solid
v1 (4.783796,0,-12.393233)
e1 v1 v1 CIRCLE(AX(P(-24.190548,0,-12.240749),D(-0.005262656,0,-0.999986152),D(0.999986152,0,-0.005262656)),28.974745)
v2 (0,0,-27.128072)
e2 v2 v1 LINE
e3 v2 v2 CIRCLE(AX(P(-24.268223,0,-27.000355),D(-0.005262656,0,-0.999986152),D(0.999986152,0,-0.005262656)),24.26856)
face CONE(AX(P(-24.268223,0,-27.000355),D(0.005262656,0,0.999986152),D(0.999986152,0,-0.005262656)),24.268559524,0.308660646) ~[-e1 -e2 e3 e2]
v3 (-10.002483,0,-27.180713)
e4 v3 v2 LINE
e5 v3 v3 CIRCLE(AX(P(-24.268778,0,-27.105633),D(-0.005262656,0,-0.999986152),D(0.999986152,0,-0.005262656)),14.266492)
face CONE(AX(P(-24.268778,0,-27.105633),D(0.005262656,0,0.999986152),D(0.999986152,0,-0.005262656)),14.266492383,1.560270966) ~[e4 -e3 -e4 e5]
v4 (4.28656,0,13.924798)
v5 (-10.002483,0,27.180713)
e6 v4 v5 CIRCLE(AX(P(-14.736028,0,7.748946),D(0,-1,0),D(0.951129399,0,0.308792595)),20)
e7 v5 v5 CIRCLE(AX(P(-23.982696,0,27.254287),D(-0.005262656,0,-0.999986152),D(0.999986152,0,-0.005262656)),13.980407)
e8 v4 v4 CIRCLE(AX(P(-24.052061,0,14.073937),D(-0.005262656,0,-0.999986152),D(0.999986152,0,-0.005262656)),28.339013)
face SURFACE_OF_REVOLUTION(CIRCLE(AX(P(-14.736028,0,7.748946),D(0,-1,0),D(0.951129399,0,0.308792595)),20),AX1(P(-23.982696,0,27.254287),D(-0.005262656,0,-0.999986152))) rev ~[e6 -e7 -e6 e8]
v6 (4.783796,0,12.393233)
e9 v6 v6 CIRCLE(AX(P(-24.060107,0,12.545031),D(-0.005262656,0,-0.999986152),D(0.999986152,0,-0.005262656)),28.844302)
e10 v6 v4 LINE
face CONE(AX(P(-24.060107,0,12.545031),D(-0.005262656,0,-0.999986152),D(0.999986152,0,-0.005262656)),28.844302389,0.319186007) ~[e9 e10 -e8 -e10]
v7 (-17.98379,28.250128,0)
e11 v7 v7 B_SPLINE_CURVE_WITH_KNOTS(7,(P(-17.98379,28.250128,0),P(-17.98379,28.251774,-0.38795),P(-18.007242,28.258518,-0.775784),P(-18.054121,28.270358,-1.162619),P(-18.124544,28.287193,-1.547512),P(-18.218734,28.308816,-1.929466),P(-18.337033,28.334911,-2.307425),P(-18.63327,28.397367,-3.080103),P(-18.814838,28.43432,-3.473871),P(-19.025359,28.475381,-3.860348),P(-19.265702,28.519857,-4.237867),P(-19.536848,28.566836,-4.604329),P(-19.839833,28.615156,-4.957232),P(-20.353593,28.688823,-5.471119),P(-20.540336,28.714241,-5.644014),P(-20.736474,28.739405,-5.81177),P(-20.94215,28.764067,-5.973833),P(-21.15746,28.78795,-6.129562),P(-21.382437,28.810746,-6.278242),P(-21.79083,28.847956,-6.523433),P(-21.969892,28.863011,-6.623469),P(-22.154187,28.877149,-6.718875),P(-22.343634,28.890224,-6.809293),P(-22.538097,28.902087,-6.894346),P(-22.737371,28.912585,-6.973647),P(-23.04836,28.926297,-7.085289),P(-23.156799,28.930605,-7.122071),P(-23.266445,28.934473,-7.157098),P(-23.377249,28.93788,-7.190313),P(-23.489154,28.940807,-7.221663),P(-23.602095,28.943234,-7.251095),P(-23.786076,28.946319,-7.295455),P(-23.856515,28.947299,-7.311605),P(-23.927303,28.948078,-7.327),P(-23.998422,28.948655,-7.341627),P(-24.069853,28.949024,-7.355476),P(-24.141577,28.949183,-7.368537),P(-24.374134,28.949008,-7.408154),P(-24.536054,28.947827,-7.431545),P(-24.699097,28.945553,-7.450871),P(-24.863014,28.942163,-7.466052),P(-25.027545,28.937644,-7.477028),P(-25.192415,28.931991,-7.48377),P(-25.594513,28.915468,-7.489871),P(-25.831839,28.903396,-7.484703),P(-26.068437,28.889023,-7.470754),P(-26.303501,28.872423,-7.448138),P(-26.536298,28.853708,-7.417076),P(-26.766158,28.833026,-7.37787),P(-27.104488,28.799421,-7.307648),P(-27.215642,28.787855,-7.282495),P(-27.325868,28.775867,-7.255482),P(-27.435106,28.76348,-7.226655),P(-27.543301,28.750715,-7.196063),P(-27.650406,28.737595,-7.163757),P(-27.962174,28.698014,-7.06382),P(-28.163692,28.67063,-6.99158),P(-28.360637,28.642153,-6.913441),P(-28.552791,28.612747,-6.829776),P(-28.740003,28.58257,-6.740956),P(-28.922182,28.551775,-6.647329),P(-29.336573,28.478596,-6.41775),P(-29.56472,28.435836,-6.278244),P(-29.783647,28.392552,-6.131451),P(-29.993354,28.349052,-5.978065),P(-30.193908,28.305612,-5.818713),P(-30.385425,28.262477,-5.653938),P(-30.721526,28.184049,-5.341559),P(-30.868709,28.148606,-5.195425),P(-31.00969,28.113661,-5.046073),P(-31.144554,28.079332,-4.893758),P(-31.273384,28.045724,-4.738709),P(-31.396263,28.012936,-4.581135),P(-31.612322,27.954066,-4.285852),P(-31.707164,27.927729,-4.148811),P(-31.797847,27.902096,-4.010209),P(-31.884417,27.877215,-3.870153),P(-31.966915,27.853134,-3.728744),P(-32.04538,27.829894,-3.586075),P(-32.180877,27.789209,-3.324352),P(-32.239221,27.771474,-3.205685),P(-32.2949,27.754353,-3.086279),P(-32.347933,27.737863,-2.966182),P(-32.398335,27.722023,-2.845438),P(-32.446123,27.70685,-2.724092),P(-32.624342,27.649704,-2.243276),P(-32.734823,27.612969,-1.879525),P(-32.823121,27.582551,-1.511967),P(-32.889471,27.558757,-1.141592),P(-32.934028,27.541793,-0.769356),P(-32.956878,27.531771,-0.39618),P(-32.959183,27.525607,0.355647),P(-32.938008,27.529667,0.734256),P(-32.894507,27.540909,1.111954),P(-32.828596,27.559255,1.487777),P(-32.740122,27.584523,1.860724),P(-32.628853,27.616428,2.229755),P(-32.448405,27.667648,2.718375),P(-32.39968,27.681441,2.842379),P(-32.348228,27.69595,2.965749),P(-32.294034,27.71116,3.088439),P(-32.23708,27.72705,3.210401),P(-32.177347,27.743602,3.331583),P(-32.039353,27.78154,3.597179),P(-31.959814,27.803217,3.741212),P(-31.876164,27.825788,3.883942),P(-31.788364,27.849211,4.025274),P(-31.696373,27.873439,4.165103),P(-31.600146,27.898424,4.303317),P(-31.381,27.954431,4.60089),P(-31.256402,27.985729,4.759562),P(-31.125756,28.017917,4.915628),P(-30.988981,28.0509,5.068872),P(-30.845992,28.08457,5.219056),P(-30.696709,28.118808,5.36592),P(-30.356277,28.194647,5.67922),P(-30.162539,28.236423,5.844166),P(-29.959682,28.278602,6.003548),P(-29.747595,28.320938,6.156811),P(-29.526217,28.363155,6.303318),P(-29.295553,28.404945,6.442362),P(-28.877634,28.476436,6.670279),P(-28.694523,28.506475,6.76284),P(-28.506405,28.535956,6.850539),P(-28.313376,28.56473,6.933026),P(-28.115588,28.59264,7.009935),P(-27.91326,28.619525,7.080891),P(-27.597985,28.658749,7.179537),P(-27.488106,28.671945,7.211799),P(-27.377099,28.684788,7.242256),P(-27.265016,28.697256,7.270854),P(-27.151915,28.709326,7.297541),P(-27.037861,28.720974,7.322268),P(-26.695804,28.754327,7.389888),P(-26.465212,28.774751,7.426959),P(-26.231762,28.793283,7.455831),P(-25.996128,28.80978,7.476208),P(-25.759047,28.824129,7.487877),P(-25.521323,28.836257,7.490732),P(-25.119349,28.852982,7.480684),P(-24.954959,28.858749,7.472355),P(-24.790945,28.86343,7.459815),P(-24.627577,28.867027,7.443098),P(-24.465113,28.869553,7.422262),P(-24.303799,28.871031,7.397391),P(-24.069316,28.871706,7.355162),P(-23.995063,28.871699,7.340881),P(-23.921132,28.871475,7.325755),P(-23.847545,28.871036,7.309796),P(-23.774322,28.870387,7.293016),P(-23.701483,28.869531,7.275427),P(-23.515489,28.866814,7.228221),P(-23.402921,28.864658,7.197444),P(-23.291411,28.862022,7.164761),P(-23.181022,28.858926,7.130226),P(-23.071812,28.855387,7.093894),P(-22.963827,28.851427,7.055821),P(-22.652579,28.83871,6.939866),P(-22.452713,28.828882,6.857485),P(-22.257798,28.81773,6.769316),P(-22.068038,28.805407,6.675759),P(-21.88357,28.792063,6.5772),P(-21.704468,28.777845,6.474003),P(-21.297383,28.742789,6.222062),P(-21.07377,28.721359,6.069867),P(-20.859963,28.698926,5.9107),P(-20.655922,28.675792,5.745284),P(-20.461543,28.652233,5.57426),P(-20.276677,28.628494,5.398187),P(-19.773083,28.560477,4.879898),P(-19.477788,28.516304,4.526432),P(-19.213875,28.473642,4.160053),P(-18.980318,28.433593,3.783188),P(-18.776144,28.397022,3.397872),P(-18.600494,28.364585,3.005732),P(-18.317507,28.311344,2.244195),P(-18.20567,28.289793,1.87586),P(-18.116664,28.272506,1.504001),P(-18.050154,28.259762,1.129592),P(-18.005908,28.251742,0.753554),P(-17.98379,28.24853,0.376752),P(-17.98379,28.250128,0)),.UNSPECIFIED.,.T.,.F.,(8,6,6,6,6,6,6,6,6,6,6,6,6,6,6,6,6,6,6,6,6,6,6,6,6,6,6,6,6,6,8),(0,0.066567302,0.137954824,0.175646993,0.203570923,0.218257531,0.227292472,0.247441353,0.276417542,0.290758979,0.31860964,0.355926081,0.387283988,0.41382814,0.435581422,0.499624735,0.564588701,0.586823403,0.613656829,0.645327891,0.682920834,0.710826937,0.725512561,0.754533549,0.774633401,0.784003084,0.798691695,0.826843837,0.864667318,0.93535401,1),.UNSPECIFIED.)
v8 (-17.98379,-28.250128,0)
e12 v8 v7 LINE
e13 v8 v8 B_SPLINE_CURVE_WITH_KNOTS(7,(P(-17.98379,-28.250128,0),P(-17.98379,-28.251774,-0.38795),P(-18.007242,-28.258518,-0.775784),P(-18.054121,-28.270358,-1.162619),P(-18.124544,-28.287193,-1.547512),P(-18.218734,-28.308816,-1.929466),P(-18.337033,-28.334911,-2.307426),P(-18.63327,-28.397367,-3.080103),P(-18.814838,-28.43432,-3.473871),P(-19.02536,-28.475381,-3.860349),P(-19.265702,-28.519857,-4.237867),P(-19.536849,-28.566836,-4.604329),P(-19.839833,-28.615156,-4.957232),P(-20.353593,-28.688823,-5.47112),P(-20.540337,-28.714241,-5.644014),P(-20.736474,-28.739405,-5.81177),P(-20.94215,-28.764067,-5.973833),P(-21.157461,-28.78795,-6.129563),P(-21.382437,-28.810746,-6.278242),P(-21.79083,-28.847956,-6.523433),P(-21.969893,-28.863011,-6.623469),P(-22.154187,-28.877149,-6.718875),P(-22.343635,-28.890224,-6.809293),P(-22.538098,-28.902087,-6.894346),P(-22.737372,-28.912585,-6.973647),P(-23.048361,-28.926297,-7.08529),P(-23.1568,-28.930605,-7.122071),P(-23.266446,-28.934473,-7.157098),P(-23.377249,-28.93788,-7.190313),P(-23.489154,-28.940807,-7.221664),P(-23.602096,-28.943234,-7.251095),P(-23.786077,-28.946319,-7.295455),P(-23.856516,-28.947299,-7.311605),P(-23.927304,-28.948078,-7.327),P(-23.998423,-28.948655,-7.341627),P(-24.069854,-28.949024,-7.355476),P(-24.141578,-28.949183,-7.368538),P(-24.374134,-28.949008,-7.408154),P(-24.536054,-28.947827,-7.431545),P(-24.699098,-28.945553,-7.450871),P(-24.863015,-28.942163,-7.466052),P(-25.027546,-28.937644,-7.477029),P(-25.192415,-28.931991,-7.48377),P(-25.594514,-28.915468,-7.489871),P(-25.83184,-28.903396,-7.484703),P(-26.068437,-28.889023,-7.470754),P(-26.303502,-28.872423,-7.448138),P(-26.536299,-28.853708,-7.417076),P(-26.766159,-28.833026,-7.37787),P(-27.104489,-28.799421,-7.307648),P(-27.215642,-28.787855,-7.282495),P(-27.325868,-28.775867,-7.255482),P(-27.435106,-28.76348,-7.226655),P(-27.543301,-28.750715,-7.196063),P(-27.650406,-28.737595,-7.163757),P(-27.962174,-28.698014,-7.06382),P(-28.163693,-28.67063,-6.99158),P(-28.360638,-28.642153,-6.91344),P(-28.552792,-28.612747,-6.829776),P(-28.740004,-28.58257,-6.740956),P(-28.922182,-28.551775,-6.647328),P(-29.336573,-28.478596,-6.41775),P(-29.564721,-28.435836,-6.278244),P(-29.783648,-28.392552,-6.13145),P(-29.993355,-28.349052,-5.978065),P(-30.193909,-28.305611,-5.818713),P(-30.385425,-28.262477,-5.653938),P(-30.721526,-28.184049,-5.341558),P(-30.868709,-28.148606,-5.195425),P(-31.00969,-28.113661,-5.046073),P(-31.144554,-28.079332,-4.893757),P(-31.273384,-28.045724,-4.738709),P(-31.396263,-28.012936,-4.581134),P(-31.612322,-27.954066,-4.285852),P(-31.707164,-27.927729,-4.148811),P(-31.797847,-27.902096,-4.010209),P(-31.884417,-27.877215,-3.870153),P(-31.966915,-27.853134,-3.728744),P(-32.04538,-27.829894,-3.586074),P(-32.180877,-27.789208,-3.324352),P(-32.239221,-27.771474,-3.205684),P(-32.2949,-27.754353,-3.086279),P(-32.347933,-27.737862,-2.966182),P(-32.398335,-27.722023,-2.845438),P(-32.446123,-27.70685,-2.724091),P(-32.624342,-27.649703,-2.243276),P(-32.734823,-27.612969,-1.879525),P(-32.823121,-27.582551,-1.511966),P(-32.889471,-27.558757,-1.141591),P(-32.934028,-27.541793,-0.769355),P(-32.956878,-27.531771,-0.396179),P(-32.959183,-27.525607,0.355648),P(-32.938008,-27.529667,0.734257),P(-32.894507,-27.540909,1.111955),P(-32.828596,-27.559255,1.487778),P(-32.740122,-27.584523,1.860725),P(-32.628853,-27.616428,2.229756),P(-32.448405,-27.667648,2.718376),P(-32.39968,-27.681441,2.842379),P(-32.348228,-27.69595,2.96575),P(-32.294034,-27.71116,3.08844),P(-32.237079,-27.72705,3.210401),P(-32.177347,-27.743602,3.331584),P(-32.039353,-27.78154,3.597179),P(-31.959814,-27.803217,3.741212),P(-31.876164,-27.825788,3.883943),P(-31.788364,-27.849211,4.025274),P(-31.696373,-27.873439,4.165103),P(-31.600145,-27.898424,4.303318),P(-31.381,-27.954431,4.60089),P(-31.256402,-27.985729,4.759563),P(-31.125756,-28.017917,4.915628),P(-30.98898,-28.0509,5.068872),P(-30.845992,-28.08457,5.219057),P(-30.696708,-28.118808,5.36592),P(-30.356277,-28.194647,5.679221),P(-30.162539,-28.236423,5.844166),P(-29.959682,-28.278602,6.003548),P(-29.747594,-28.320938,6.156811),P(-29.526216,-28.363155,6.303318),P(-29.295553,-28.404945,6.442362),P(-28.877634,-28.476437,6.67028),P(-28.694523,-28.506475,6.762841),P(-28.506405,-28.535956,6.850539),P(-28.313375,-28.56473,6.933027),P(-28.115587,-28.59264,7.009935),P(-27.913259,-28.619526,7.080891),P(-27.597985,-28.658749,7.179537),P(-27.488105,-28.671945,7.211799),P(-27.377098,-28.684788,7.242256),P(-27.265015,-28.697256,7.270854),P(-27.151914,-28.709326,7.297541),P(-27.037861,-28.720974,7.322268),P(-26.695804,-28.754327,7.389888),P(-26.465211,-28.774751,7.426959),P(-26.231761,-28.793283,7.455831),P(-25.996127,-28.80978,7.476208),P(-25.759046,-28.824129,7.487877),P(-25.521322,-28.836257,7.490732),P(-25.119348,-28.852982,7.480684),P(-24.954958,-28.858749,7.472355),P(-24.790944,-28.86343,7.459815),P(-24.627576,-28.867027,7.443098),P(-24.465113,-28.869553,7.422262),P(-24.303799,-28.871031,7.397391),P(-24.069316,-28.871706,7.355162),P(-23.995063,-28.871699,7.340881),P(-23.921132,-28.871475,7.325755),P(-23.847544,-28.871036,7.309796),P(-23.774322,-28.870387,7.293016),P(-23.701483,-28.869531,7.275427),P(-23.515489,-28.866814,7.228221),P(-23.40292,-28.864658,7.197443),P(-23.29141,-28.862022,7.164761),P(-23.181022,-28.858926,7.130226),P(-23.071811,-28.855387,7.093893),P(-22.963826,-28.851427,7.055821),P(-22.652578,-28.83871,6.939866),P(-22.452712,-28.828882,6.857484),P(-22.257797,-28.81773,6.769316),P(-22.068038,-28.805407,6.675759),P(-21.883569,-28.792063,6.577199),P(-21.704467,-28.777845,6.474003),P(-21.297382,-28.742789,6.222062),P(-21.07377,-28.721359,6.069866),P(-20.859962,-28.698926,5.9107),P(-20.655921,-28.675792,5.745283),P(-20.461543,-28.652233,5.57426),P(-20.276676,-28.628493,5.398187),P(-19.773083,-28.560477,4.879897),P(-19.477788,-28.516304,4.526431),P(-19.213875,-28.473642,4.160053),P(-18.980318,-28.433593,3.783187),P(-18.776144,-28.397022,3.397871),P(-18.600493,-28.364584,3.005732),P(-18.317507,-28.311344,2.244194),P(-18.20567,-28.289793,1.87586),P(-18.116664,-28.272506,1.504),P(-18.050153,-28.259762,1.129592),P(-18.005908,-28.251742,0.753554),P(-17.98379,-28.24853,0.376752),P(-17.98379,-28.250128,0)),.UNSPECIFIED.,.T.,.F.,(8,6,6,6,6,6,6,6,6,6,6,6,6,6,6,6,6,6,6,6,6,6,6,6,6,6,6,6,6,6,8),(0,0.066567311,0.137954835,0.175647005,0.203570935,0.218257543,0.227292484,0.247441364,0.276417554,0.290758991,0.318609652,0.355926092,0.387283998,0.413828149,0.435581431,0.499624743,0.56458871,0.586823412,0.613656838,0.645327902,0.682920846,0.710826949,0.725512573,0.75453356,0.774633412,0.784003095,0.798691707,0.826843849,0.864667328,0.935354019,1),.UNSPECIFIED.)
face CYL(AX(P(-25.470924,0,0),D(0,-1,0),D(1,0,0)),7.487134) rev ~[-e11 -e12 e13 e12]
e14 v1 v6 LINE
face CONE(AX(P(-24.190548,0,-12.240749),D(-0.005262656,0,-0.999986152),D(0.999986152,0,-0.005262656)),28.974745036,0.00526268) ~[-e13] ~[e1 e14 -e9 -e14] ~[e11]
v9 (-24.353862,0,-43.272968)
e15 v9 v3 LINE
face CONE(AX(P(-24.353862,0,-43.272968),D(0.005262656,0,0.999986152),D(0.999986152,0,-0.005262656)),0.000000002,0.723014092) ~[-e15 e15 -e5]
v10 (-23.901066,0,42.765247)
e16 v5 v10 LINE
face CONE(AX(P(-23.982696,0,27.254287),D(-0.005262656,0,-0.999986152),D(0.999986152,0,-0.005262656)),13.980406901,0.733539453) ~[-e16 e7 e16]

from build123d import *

# Parameters (mm, degrees)
F2_R          = 7.4871337732
F3_DEPTH      = 38.4
F3_DEPTH_BACK = 28.9757450369


# Not quite as in the source:
# - a fillet or chamfer that OpenCascade refuses, or shapes differently, is made with other operations: its cross-section is extruded or revolved along the edge and cut away or added


with BuildPart() as f1:
    # F0 (on Front) → F1 (revolve)
    with BuildSketch(Plane.XZ):
        Polygon((-10.0024826825, 27.1807126701), (-23.9010660062, 42.7652467351), (-24.3538618088, -43.2729683816), (-10.0024826825, -27.1807126701), (0, -27.1280723152), (4.7837961465, -12.3932333663), (4.7837961465, 0), (4.7837961465, 12.3932333663), (0, 27.1280723152), align=None)
    revolve(axis=Axis((-24.1274639075, 0, -0.2538608233), (-0.005262656, 0, -0.9999861521)))

    # F2 (on Front) → F3 (cut, two sides)
    with BuildSketch(Plane.XZ) as f3_sk:
        with Locations((-25.4709236324, 0)):
            Circle(F2_R)
    extrude(amount=-F3_DEPTH, mode=Mode.SUBTRACT)
    extrude(f3_sk.sketch, amount=F3_DEPTH_BACK, mode=Mode.SUBTRACT)

    # F4: fillet of radius 20 on 1 edges, made by hand

    # F4_s1 → F4_t2 (revolve, cut)
    with BuildSketch(Plane.XZ):
        with BuildLine():
            ThreePointArc((4.2865600872, 13.9247980545), (-1.133885263, 22.4112009628), (-10.0024826825, 27.1807126701))
            Line((-10.0024826825, 27.1807126701), (-9.9078117783, 27.5693480003))
            ThreePointArc((-9.9078117783, 27.5693480003), (-4.9991362788, 27.5543869535), (0.0021050624, 27.5280667761))
            Line((0.0021050624, 27.5280667761), (0.3804517595, 27.2515893532))
            Line((0.3804517595, 27.2515893532), (4.6670118467, 14.0483150925))
            Line((4.6670118467, 14.0483150925), (4.2865600872, 13.9247980545))
        make_face()
    revolve(axis=Axis((-23.9826959839, 0, 27.2542867429), (-0.005262656, 0, -0.9999861521)), mode=Mode.SUBTRACT)


solid = f1.part
